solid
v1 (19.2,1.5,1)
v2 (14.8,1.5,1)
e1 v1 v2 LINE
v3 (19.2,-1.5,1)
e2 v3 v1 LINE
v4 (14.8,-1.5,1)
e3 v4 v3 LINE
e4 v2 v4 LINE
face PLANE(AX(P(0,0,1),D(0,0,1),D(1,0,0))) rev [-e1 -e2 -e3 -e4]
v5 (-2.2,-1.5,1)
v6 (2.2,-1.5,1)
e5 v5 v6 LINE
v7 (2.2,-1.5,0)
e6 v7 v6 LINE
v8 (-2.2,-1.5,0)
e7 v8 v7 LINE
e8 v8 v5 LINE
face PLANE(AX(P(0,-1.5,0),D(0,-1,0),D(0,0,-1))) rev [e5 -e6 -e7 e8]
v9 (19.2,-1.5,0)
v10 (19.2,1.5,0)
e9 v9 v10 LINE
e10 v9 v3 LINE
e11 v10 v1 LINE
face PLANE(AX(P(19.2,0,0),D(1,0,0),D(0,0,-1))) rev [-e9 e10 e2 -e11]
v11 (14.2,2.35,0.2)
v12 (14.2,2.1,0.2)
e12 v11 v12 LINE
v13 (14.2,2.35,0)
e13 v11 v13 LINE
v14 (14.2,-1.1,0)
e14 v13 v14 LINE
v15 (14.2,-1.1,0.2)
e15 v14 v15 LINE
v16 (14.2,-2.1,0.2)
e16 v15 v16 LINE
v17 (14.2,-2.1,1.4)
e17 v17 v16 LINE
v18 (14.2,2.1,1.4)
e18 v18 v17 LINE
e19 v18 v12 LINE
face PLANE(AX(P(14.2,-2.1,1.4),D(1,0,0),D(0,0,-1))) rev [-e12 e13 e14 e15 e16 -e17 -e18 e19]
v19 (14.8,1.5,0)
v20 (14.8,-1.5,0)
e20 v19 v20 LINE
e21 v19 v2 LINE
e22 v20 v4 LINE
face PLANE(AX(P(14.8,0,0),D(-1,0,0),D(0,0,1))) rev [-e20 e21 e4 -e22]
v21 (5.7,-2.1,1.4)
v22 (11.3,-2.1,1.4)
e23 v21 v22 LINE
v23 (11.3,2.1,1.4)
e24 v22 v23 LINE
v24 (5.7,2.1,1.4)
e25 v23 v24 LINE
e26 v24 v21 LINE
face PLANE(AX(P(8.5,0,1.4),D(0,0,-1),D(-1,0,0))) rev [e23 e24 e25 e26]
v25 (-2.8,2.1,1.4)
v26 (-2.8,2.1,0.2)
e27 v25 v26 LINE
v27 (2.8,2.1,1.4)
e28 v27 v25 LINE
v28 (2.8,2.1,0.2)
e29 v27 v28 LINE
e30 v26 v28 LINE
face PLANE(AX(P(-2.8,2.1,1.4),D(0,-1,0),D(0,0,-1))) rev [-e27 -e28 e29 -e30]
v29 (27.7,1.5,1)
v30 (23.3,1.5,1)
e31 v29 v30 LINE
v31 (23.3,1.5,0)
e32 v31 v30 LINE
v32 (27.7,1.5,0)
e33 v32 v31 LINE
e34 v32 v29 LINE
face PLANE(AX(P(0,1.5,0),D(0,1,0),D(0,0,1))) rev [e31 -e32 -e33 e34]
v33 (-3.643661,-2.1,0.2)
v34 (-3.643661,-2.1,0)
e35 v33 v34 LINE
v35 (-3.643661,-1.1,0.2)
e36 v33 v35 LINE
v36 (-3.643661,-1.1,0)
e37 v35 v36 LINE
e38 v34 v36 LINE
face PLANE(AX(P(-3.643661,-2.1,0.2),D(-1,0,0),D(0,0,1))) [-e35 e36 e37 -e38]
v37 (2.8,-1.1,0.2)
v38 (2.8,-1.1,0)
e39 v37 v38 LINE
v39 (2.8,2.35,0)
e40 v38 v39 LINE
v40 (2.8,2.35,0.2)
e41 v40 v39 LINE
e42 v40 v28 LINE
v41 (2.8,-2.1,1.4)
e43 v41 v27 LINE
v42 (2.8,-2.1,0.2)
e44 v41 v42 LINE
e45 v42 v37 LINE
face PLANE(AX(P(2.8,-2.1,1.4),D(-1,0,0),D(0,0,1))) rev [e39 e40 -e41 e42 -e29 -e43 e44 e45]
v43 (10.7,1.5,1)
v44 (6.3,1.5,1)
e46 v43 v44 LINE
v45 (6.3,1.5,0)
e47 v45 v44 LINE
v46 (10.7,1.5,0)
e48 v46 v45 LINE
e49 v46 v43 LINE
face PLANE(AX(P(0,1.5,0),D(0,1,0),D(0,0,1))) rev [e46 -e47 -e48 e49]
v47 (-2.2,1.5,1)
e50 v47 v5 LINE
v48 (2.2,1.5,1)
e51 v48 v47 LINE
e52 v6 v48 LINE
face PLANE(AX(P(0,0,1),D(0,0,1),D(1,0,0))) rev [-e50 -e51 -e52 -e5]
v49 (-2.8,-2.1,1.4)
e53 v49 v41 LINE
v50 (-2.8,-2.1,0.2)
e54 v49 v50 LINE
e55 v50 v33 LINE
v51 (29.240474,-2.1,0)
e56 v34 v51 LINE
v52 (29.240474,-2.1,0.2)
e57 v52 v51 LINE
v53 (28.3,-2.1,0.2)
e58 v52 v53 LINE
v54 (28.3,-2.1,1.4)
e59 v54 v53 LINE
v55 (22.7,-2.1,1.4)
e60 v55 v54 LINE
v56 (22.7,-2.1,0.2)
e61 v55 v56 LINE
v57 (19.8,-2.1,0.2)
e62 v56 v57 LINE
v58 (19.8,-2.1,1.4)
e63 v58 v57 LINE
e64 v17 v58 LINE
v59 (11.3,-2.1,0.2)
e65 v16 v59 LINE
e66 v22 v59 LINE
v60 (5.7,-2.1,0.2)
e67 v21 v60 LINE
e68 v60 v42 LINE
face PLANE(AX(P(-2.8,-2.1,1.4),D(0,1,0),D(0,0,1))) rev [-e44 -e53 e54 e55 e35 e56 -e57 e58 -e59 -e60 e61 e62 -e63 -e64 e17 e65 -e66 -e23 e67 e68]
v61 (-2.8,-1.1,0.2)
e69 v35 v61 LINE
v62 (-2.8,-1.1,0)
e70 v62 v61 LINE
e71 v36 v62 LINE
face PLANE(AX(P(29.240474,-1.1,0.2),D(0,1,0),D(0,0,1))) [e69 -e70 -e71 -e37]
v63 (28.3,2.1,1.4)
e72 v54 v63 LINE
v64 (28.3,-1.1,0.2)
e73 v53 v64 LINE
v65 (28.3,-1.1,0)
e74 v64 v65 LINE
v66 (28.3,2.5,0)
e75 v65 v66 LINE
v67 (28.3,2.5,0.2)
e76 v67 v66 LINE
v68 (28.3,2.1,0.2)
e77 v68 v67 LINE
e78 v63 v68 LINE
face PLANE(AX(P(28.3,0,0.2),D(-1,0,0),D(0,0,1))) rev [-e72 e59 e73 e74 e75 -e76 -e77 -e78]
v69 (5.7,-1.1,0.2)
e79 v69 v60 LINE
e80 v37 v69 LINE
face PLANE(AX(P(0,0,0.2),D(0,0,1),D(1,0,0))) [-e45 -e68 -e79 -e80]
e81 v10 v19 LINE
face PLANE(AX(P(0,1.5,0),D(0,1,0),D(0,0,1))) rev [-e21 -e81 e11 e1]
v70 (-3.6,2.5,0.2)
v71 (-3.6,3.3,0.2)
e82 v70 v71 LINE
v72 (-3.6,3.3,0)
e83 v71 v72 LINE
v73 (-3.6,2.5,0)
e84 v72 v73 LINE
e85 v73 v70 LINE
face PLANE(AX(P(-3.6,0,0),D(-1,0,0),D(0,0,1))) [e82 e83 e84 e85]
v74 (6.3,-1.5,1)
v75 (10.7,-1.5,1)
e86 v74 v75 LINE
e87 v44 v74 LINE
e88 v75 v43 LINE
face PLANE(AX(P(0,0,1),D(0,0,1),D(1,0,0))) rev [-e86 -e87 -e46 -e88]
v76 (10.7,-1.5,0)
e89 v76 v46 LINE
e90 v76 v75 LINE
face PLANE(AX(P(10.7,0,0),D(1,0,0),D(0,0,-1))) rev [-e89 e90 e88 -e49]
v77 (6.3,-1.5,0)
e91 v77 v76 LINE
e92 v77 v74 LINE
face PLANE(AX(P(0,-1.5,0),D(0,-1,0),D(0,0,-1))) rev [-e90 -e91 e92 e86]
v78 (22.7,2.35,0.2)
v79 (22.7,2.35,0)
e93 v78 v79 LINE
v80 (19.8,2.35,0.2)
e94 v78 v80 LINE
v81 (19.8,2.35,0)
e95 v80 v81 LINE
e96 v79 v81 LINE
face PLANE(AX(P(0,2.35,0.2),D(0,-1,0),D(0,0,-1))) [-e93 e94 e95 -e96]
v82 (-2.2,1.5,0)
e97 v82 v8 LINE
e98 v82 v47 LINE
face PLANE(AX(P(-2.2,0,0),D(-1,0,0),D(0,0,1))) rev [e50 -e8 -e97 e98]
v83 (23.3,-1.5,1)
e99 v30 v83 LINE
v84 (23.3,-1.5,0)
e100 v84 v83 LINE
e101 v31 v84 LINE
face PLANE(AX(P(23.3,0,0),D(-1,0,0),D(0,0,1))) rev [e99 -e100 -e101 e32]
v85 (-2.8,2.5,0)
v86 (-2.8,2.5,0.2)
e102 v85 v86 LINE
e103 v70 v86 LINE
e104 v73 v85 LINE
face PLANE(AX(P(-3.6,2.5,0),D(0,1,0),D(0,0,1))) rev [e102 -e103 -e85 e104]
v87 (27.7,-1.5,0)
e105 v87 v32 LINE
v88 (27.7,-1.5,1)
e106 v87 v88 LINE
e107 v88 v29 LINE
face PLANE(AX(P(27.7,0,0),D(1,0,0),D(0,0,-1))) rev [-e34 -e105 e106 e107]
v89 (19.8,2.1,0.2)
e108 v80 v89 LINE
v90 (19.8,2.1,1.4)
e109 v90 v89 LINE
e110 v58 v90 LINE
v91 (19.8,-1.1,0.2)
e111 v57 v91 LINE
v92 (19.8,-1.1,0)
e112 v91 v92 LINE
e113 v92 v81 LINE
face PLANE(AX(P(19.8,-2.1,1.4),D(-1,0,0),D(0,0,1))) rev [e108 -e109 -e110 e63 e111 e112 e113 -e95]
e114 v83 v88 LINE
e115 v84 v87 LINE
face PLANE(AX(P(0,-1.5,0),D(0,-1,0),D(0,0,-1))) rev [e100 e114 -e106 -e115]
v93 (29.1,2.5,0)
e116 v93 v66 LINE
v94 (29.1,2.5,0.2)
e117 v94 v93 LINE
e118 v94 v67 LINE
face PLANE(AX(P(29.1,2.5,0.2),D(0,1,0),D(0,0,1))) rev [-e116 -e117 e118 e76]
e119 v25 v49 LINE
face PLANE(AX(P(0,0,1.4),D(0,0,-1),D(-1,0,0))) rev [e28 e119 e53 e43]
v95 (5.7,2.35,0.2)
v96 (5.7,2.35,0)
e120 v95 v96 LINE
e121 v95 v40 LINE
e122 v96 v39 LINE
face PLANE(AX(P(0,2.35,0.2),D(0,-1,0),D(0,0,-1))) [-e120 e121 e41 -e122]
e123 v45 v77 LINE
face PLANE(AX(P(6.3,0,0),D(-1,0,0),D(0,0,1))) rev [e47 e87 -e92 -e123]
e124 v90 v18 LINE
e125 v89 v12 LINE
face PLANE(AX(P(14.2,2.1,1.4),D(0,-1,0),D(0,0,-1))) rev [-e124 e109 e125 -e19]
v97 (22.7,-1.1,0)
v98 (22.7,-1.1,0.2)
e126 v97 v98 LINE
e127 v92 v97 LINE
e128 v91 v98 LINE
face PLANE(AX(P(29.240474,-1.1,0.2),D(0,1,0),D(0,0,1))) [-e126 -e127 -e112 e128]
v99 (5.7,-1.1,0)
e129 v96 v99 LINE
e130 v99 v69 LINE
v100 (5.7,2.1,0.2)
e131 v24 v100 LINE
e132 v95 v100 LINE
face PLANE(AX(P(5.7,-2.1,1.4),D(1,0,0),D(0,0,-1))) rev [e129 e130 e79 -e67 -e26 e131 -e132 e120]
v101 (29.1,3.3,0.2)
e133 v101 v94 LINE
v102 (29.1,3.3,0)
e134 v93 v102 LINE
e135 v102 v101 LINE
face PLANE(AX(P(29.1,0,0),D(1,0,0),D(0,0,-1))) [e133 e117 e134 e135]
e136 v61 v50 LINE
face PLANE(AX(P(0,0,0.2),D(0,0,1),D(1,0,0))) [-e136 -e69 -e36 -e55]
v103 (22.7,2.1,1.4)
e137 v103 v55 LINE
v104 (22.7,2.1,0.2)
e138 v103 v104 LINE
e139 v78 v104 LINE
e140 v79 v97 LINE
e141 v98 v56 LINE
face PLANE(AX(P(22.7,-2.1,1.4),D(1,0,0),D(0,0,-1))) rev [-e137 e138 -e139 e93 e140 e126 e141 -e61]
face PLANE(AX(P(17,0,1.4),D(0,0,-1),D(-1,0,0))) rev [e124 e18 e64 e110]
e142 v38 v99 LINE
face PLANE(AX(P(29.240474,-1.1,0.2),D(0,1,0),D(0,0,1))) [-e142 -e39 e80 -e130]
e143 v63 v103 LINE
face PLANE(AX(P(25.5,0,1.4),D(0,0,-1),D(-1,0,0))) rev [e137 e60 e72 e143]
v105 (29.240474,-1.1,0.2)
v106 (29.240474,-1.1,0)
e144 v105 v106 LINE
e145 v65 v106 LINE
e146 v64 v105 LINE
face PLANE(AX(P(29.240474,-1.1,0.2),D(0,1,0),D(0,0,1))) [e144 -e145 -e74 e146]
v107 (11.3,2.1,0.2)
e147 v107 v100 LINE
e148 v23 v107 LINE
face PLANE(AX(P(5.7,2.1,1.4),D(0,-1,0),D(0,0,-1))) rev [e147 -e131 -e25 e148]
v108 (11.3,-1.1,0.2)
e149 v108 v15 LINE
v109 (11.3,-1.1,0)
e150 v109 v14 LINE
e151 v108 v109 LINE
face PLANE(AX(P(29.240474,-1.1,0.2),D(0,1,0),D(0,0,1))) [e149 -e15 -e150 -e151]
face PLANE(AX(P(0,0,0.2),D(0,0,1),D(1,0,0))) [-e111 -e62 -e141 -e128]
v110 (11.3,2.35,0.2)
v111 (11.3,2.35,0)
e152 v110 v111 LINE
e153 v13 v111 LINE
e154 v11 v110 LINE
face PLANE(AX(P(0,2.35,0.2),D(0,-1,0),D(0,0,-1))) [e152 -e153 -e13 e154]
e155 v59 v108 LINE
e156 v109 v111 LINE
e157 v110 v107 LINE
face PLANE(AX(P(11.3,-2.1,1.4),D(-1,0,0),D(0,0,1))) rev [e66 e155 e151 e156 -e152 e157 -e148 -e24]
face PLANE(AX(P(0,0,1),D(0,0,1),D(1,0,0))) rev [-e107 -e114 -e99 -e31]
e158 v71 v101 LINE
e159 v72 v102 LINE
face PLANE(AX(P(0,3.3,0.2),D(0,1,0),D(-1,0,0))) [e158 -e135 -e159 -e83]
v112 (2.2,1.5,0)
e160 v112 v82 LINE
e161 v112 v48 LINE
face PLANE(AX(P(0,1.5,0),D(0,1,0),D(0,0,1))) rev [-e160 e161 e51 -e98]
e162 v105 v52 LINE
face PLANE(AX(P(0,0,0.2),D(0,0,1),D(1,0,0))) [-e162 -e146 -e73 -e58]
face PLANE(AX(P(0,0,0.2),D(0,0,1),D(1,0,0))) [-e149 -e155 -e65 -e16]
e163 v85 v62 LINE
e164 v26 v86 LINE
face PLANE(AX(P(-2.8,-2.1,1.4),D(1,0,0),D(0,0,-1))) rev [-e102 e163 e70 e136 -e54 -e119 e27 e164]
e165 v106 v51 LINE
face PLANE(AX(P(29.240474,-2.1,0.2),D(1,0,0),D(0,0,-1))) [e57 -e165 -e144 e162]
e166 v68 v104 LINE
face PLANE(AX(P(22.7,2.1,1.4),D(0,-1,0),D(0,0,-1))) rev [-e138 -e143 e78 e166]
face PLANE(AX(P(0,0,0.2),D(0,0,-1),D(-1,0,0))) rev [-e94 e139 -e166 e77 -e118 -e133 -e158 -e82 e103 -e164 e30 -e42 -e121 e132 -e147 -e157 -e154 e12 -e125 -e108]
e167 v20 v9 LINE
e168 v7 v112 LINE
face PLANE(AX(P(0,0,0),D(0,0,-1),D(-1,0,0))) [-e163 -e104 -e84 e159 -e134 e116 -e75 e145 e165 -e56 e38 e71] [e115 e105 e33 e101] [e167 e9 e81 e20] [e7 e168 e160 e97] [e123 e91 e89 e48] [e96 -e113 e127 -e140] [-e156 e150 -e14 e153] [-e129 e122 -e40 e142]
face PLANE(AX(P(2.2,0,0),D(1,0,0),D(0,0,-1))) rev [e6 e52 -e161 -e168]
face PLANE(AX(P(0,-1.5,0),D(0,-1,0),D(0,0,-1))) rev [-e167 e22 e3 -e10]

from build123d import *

# Parameters (mm, degrees)
SKETCH_1_W             = 5.6
SKETCH_1_H             = 4.2
EXTRUDE_1_DEPTH        = 1.4
SKETCH_3_W             = 31.1
SKETCH_3_H             = 1.5
EXTRUDE_2_DEPTH        = 0.2
PATTERN_LINEAR_1_COUNT = 4
PATTERN_LINEAR_1_PITCH = 8.5
SKETCH_4_W             = 2.9
SKETCH_4_H             = 1.1
CUT_EXTRUDE_1_DEPTH    = 0.2
SKETCH_5_W             = 0.2
SKETCH_5_H             = 0.8
EXTRUDE_3_DEPTH        = 0.8
SKETCH_6_W             = 0.2
SKETCH_6_H             = 0.8
EXTRUDE_4_DEPTH        = 0.8
SKETCH_7_W             = 32.884134448
SKETCH_7_H             = 1
EXTRUDE_5_DEPTH        = 0.2
CUT_EXTRUDE_START      = -0.4
SKETCH_8_W             = 4.4
SKETCH_8_H             = 3
CUT_EXTRUDE_2_DEPTH    = 1


with BuildPart() as part:
    # Эскиз1 → Бобышка-Вытянуть1 (new body)
    with BuildSketch(Plane.XY):
        Rectangle(SKETCH_1_W, SKETCH_1_H)
    extrude_1 = extrude(amount=EXTRUDE_1_DEPTH)

    # Эскиз3 → Бобышка-Вытянуть2 (add)
    with BuildSketch(Plane(origin=(0, 0, 0), x_dir=(-1, 0, 0), z_dir=(0, 0, -1))):
        with Locations((-12.75, 2.55)):
            Rectangle(SKETCH_3_W, SKETCH_3_H)
    extrude(amount=-EXTRUDE_2_DEPTH)

    # Линейный массив1: Бобышка-Вытянуть1 ×4
    with Locations(*[(i * PATTERN_LINEAR_1_PITCH, 0, 0) for i in range(1, PATTERN_LINEAR_1_COUNT)]):
        add(extrude_1)

    # Эскиз4 → Вырез-Вытянуть1 (cut)
    with BuildSketch(Plane(origin=(0, 0, 0), x_dir=(-1, 0, 0), z_dir=(0, 0, -1))):
        with Locations((-21.25, 1.8)):
            Rectangle(SKETCH_4_W, SKETCH_4_H)
        with Locations((-12.75, 1.8)):
            Rectangle(SKETCH_4_W, SKETCH_4_H)
        with Locations((-4.25, 1.8)):
            Rectangle(SKETCH_4_W, SKETCH_4_H)
    extrude(amount=-CUT_EXTRUDE_1_DEPTH, mode=Mode.SUBTRACT)

    # Эскиз5 → Бобышка-Вытянуть3 (add)
    with BuildSketch(Plane(origin=(28.3, 0, 0), x_dir=(0, 0, -1), z_dir=(1, 0, 0))):
        with Locations((-0.1, 2.9)):
            Rectangle(SKETCH_5_W, SKETCH_5_H)
    extrude(amount=EXTRUDE_3_DEPTH)

    # Эскиз6 → Бобышка-Вытянуть4 (add)
    with BuildSketch(Plane.ZY.offset(2.8)):
        with Locations((0.1, 2.9)):
            Rectangle(SKETCH_6_W, SKETCH_6_H)
    extrude(amount=EXTRUDE_4_DEPTH)

    # Эскиз7 → Бобышка-Вытянуть5 (add)
    with BuildSketch(Plane(origin=(0, 0, 0), x_dir=(-1, 0, 0), z_dir=(0, 0, -1))):
        with Locations((-12.798406479, -1.6)):
            Rectangle(SKETCH_7_W, SKETCH_7_H)
    extrude(amount=-EXTRUDE_5_DEPTH)

    # Эскиз8 → Вырез-Вытянуть2 (cut)
    with BuildSketch(Plane.XY.offset(1.4).offset(CUT_EXTRUDE_START)):
        Rectangle(SKETCH_8_W, SKETCH_8_H)
        with Locations((8.5, 0)):
            Rectangle(SKETCH_8_W, SKETCH_8_H)
        with Locations((17, 0)):
            Rectangle(SKETCH_8_W, SKETCH_8_H)
        with Locations((25.5, 0)):
            Rectangle(SKETCH_8_W, SKETCH_8_H)
    extrude(amount=-CUT_EXTRUDE_2_DEPTH, mode=Mode.SUBTRACT)


solid = part.part
